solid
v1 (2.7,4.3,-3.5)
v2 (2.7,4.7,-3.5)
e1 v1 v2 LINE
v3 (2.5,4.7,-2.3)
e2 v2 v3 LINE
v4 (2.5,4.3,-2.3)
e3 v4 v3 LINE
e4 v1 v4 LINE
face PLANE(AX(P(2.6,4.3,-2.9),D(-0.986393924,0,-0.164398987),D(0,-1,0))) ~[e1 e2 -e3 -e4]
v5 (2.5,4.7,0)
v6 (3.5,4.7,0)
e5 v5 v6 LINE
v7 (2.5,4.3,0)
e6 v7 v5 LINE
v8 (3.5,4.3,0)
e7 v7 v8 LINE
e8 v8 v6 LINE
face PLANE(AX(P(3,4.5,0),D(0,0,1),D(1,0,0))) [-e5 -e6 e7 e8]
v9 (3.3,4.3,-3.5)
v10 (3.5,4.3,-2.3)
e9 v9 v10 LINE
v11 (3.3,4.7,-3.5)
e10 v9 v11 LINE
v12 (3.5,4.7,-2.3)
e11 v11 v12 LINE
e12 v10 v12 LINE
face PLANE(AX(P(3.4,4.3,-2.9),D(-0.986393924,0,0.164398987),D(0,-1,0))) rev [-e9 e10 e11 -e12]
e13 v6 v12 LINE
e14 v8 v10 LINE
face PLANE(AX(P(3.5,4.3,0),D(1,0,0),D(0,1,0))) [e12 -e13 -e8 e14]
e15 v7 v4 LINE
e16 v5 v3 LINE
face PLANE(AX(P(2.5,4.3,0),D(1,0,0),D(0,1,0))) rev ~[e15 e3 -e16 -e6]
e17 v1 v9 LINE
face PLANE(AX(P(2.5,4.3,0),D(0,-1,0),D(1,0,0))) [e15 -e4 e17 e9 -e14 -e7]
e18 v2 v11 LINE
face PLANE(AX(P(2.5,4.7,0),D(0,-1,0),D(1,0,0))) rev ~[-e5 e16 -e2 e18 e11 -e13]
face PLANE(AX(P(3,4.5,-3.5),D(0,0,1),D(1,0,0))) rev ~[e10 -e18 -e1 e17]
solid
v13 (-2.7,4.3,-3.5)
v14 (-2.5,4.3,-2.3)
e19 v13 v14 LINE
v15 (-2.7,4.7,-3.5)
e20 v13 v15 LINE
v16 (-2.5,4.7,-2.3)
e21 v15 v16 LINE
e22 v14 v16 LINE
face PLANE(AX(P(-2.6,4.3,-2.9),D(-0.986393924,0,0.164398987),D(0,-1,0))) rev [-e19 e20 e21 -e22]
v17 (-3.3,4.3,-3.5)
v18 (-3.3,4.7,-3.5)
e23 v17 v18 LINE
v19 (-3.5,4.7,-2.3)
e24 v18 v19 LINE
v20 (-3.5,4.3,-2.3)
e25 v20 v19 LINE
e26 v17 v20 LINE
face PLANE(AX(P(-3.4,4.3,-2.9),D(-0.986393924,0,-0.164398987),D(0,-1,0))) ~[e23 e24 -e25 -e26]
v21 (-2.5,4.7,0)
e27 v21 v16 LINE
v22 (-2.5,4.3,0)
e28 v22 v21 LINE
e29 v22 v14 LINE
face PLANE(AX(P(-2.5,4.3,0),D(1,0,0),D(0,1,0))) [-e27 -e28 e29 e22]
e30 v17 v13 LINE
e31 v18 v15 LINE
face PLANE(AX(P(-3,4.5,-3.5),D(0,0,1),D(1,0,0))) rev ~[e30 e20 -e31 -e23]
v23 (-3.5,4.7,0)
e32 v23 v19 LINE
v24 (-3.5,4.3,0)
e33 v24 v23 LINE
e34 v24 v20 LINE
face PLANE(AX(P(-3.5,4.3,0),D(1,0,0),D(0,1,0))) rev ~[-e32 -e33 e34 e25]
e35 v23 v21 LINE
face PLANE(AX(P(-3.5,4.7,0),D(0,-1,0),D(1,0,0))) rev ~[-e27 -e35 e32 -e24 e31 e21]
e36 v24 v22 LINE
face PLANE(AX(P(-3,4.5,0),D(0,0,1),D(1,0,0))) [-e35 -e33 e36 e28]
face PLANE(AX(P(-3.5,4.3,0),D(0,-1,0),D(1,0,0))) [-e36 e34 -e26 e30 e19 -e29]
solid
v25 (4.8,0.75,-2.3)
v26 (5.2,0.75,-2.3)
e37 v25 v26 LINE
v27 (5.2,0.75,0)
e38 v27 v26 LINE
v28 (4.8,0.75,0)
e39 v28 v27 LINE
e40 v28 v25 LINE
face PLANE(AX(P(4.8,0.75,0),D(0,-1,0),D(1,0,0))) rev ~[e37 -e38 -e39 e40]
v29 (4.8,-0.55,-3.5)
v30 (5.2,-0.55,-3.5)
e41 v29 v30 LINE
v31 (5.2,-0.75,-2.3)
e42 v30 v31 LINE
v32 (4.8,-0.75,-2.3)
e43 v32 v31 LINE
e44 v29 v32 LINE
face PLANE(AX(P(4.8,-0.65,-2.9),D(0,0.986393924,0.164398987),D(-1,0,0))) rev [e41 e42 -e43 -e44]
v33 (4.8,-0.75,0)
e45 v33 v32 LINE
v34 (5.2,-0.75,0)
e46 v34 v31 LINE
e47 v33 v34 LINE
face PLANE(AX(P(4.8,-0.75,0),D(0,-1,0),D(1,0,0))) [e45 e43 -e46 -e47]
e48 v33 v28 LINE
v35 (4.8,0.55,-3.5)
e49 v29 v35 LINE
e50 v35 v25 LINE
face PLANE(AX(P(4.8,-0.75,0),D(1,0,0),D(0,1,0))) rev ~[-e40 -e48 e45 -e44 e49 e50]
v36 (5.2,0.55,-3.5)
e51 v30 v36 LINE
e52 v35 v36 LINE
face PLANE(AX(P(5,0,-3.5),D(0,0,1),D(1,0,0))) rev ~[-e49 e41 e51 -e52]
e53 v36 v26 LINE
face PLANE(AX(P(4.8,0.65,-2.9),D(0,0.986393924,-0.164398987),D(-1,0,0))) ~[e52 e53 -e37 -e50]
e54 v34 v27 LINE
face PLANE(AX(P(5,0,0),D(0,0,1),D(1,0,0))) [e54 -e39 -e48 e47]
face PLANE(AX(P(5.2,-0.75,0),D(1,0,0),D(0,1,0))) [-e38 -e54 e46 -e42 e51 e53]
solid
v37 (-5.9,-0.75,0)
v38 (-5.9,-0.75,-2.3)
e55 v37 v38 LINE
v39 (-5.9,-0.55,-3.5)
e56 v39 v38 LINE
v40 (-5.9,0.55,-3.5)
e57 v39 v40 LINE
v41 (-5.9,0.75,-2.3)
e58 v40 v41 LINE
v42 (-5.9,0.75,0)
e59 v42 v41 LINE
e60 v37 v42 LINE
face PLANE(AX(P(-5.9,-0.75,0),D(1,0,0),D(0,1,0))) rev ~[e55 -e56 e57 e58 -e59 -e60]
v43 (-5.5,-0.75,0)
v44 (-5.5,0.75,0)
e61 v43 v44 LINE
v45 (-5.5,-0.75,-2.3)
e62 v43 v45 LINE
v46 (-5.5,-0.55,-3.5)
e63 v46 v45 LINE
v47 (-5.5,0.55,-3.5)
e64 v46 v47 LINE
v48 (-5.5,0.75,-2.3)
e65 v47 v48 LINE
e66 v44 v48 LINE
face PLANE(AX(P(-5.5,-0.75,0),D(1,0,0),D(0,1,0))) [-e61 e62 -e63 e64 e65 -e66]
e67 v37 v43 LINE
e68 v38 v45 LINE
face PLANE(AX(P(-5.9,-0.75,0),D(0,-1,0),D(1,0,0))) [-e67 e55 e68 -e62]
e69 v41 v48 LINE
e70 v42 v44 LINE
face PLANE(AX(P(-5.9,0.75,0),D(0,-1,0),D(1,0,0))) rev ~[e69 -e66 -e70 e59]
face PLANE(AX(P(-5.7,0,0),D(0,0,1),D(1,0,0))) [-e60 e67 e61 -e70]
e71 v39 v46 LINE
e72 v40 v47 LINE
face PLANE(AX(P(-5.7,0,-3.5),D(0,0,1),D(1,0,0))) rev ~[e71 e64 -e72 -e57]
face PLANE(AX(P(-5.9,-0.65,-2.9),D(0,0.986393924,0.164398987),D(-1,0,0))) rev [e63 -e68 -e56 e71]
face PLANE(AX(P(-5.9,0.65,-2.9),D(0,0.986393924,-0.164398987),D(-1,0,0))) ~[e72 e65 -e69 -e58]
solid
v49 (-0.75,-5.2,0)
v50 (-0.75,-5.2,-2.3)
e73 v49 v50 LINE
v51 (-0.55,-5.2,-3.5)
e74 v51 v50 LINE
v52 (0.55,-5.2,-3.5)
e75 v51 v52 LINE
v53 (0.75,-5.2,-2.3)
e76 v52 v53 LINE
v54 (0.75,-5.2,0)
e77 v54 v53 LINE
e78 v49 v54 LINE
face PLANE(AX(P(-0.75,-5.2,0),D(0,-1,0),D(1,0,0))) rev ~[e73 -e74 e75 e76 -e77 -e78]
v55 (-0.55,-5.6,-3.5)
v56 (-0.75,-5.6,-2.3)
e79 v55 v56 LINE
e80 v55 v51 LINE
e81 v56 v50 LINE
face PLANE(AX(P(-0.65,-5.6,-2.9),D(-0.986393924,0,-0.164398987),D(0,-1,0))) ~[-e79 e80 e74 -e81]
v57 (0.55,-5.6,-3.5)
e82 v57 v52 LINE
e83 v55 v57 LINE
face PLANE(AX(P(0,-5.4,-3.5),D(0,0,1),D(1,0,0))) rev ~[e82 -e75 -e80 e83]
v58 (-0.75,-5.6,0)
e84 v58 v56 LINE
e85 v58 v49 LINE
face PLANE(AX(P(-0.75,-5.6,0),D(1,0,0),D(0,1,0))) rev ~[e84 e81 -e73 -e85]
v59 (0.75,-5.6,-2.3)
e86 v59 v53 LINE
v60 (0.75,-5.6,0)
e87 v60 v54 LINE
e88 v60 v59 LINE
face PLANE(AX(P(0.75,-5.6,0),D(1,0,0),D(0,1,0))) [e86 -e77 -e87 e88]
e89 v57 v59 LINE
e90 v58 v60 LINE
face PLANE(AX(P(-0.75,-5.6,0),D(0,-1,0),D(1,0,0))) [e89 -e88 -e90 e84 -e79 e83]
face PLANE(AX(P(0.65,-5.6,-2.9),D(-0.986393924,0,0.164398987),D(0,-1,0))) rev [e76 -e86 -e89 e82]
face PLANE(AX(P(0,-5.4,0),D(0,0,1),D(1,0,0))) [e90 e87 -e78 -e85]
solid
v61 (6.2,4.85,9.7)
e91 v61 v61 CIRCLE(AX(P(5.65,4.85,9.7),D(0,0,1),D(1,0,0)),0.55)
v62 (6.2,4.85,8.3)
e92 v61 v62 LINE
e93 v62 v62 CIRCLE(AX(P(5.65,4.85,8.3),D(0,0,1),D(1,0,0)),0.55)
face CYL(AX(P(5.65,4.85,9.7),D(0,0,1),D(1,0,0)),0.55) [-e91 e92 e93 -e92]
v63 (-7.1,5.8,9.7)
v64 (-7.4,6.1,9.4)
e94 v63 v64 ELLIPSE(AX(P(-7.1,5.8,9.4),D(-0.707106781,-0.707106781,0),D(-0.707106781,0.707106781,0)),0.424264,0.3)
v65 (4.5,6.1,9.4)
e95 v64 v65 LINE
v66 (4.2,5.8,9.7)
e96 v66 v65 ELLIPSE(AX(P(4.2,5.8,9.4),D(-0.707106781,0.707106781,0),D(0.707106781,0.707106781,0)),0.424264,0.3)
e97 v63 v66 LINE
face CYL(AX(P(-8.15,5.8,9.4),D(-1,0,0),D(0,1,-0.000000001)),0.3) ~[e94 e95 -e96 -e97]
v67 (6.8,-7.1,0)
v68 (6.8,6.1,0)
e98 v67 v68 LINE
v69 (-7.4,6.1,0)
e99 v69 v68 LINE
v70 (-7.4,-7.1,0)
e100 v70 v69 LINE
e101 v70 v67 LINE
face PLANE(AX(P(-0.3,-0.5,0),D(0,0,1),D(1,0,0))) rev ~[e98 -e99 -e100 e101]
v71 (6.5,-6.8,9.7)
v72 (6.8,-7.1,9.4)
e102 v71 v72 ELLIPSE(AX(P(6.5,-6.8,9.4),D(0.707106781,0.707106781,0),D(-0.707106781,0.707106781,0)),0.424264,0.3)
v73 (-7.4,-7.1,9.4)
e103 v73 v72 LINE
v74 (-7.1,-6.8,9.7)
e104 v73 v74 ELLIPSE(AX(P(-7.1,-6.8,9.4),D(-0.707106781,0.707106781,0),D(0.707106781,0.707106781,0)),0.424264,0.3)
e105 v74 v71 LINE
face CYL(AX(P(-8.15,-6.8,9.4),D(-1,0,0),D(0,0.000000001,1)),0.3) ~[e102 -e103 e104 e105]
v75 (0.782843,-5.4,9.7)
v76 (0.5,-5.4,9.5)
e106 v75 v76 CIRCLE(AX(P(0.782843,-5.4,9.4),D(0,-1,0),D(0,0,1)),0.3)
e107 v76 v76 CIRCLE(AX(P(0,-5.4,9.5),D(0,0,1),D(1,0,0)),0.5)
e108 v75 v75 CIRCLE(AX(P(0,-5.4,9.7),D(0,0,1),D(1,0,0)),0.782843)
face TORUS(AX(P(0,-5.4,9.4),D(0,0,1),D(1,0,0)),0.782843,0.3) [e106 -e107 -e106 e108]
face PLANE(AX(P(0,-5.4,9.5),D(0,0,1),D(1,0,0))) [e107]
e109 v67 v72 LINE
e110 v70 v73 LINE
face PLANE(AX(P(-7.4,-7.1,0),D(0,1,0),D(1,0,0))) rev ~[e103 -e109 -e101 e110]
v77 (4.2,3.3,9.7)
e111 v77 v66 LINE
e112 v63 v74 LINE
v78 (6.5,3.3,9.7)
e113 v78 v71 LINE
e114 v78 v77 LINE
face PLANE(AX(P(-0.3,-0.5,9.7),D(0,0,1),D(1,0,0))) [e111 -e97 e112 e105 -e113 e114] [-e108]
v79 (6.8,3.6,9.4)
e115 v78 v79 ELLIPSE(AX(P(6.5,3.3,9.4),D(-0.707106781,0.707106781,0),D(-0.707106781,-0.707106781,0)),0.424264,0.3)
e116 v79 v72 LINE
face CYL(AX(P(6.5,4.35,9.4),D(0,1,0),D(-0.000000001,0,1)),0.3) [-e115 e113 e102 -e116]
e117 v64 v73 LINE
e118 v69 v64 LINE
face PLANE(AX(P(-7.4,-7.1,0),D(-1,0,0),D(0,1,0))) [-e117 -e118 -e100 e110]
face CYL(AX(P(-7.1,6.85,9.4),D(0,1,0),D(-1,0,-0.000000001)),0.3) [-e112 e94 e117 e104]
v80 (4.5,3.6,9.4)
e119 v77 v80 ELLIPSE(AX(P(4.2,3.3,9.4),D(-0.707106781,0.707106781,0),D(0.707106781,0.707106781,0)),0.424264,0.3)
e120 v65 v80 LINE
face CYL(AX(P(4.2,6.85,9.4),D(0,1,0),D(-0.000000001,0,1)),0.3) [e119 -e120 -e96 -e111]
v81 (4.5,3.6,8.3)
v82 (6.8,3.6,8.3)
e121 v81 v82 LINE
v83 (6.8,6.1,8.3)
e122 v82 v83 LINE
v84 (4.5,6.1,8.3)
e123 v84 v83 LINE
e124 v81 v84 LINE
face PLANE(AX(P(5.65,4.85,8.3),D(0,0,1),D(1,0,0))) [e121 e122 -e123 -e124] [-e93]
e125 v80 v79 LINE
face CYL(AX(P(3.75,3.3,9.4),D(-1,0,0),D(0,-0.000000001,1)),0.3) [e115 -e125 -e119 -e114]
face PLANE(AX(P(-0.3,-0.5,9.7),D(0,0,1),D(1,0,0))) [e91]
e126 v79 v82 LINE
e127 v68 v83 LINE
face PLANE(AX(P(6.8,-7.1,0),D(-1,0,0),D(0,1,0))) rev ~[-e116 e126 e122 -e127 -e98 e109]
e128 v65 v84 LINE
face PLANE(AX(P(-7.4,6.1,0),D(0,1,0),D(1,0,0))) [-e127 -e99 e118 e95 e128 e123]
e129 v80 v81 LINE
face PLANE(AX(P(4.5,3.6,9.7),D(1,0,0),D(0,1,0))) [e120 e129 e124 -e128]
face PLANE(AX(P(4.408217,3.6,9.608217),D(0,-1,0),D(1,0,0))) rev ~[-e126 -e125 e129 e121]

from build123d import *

# Parameters (mm, degrees)
F1_W         = 14.2
F1_H         = 13.2
F2_DEPTH     = 9.7
F0_W         = 0.4
F0_H         = 1.5
F3_DEPTH     = 3.5
F0_W_2       = 1.5
F0_H_2       = 0.4
F0_W_3       = 1
F4_W         = 2.3
F4_H         = 2.5
F4_R         = 0.55
F5_DEPTH     = 1.4
F4_R_2       = 0.5
F6_DEPTH     = 0.2
F7_T1_DEPTH  = 3.25
F7_T3_DEPTH  = 13.4
F7_T5_DEPTH  = 3.05
F7_T7_DEPTH  = 14.7
F7_T9_DEPTH  = 12.2
F7_T11_DEPTH = 15.7
F7_T19_DEPTH = 3.25
F7_T23_DEPTH = 3.05
F8_SIZE2     = 1.2
F8_SIZE      = 0.2
F8_2_SIZE2   = 1.2
F8_2_SIZE    = 0.2
F8_3_SIZE2   = 1.2
F8_3_SIZE    = 0.2
F8_4_SIZE2   = 1.2
F8_4_SIZE    = 0.2
F8_5_SIZE2   = 1.2
F8_5_SIZE    = 0.2


# Not quite as in the source:
# - a fillet or chamfer that OpenCascade refuses, or shapes differently, is made with other operations: its cross-section is extruded or revolved along the edge and cut away or added


with BuildPart() as f2:
    # F1 (on Top) → F2 (new body)
    with BuildSketch(Plane.XY):
        with Locations((-0.3, -0.5)):
            Rectangle(F1_W, F1_H)
    extrude(amount=F2_DEPTH)

    # F4 (on face) → F5 (cut)
    with BuildSketch(Plane.XY.offset(9.7)):
        with Locations((5.65, 4.85)):
            Rectangle(F4_W, F4_H)
        with Locations((5.65, 4.85)):
            Circle(F4_R, mode=Mode.SUBTRACT)
    extrude(amount=-F5_DEPTH, mode=Mode.SUBTRACT)

    # F4 (on face) → F6 (cut)
    with BuildSketch(Plane.XY.offset(9.7)):
        with Locations((0, -5.4)):
            Circle(F4_R_2)
    extrude(amount=-F6_DEPTH, mode=Mode.SUBTRACT)

    # F7: fillet of radius 0.3 on 7 edges, made by hand

    # F7_s2 → F7_t1 (cut)
    with BuildSketch(Plane.XZ.offset(-6.85)):
        with BuildLine():
            ThreePointArc((4.2, 9.7), (4.4121320344, 9.6121320344), (4.5, 9.4))
            Line((4.5, 9.4), (4.5, 9.7))
            Line((4.5, 9.7), (4.2, 9.7))
        make_face()
    extrude(amount=F7_T1_DEPTH, mode=Mode.SUBTRACT)

    # F7_s4 → F7_t3 (cut)
    with BuildSketch(Plane.YZ.offset(-8.15)):
        with BuildLine():
            ThreePointArc((6.1, 9.4), (6.0121320344, 9.6121320344), (5.8, 9.7))
            Line((5.8, 9.7), (6.1, 9.7))
            Line((6.1, 9.7), (6.1, 9.4))
        make_face()
    extrude(amount=F7_T3_DEPTH, mode=Mode.SUBTRACT)

    # F7_s6 → F7_t5 (cut)
    with BuildSketch(Plane.YZ.offset(4.5)):
        with BuildLine():
            ThreePointArc((3.3, 9.7), (3.5121320344, 9.6121320344), (3.6, 9.4))
            Line((3.6, 9.4), (3.6, 9.7))
            Line((3.6, 9.7), (3.3, 9.7))
        make_face()
    extrude(amount=F7_T5_DEPTH, mode=Mode.SUBTRACT)

    # F7_s8 → F7_t7 (cut)
    with BuildSketch(Plane.XZ.offset(-6.85)):
        with BuildLine():
            ThreePointArc((-7.4, 9.4), (-7.3121320344, 9.6121320344), (-7.1, 9.7))
            Line((-7.1, 9.7), (-7.4, 9.7))
            Line((-7.4, 9.7), (-7.4, 9.4))
        make_face()
    extrude(amount=F7_T7_DEPTH, mode=Mode.SUBTRACT)

    # F7_s10 → F7_t9 (cut)
    with BuildSketch(Plane.XZ.offset(-4.35)):
        with BuildLine():
            ThreePointArc((6.5, 9.7), (6.7121320344, 9.6121320344), (6.8, 9.4))
            Line((6.8, 9.4), (6.8, 9.7))
            Line((6.8, 9.7), (6.5, 9.7))
        make_face()
    extrude(amount=F7_T9_DEPTH, mode=Mode.SUBTRACT)

    # F7_s12 → F7_t11 (cut)
    with BuildSketch(Plane.YZ.offset(-8.15)):
        with BuildLine():
            ThreePointArc((-6.8, 9.7), (-7.0121320344, 9.6121320344), (-7.1, 9.4))
            Line((-7.1, 9.4), (-7.1, 9.7))
            Line((-7.1, 9.7), (-6.8, 9.7))
        make_face()
    extrude(amount=F7_T11_DEPTH, mode=Mode.SUBTRACT)

    # F7_s13 → F7_t14 (revolve, cut)
    with BuildSketch(Plane.XZ.offset(5.4)):
        with BuildLine():
            ThreePointArc((0.7828427125, 9.7), (0.6096376317, 9.6449489743), (0.5, 9.5))
            Line((0.5, 9.5), (0.5, 9.7))
            Line((0.5, 9.7), (0.7828427125, 9.7))
        make_face()
    revolve(axis=Axis((0, -5.4, 9.7), (0, 0, 1)), mode=Mode.SUBTRACT)


with BuildPart() as f3:
    # F0 (on Top) → F3 (new body)
    with BuildSketch(Plane.XY):
        with Locations((-5.7, 0)):
            Rectangle(F0_W, F0_H)
    extrude(amount=-F3_DEPTH)

    # F8
    f8_edges = [f3.edges().sort_by_distance(p)[0] for p in [
        (-5.7, -0.75, -3.5),
        (-5.7, 0.75, -3.5),
    ]]
    f8_side = f3.faces().sort_by_distance((-5.7, 0, -3.5))[0]
    chamfer(f8_edges, length=F8_SIZE, length2=F8_SIZE2, reference=f8_side)


with BuildPart() as f3b:
    # F0 (on Top) → F3, piece 2 (new body)
    with BuildSketch(Plane.XY):
        with Locations((5, 0)):
            Rectangle(F0_W, F0_H)
    extrude(amount=-F3_DEPTH)

    # F8#5
    f8_5_edges = [f3b.edges().sort_by_distance(p)[0] for p in [
        (5, -0.75, -3.5),
        (5, 0.75, -3.5),
    ]]
    f8_5_side = f3b.faces().sort_by_distance((5, 0, -3.5))[0]
    chamfer(f8_5_edges, length=F8_5_SIZE, length2=F8_5_SIZE2, reference=f8_5_side)


with BuildPart() as f3c:
    # F0 (on Top) → F3, piece 3 (new body)
    with BuildSketch(Plane.XY):
        with Locations((0, -5.4)):
            Rectangle(F0_W_2, F0_H_2)
    extrude(amount=-F3_DEPTH)

    # F8#2
    f8_2_edges = [f3c.edges().sort_by_distance(p)[0] for p in [
        (0.75, -5.4, -3.5),
        (-0.75, -5.4, -3.5),
    ]]
    f8_2_side = f3c.faces().sort_by_distance((0, -5.4, -3.5))[0]
    chamfer(f8_2_edges, length=F8_2_SIZE, length2=F8_2_SIZE2, reference=f8_2_side)


with BuildPart() as f3d:
    # F0 (on Top) → F3, piece 4 (new body)
    with BuildSketch(Plane.XY):
        with Locations((-3, 4.5)):
            Rectangle(F0_W_3, F0_H_2)
    extrude(amount=-F3_DEPTH)

    # F8#3
    f8_3_edges = [f3d.edges().sort_by_distance(p)[0] for p in [
        (-2.5, 4.5, -3.5),
        (-3.5, 4.5, -3.5),
    ]]
    f8_3_side = f3d.faces().sort_by_distance((-3, 4.5, -3.5))[0]
    chamfer(f8_3_edges, length=F8_3_SIZE, length2=F8_3_SIZE2, reference=f8_3_side)


with BuildPart() as f3e:
    # F0 (on Top) → F3, piece 5 (new body)
    with BuildSketch(Plane.XY):
        with Locations((3, 4.5)):
            Rectangle(F0_W_3, F0_H_2)
    extrude(amount=-F3_DEPTH)

    # F8#4
    f8_4_edges = [f3e.edges().sort_by_distance(p)[0] for p in [
        (2.5, 4.5, -3.5),
        (3.5, 4.5, -3.5),
    ]]
    f8_4_side = f3e.faces().sort_by_distance((3, 4.5, -3.5))[0]
    chamfer(f8_4_edges, length=F8_4_SIZE, length2=F8_4_SIZE2, reference=f8_4_side)


with BuildPart() as f7_tool17:
    # F7_s18 → F7_t19 (new body)
    with BuildSketch(Plane.XZ.offset(-6.1)):
        with BuildLine():
            ThreePointArc((4.2, 9.7), (4.4121320344, 9.6121320344), (4.5, 9.4))
            Line((4.5, 9.4), (4.5, 9.7))
            Line((4.5, 9.7), (4.2, 9.7))
        make_face()
    extrude(amount=F7_T19_DEPTH)

    split(bisect_by=Plane.XZ.offset(-3.6), keep=Keep.TOP)


with BuildPart() as f7_tool21:
    # F7_s22 → F7_t23 (new body)
    with BuildSketch(Plane.YZ.offset(3.75)):
        with BuildLine():
            ThreePointArc((3.3, 9.7), (3.5121320344, 9.6121320344), (3.6, 9.4))
            Line((3.6, 9.4), (3.6, 9.7))
            Line((3.6, 9.7), (3.3, 9.7))
        make_face()
    extrude(amount=F7_T23_DEPTH)

    split(bisect_by=Plane.YZ.offset(4.5), keep=Keep.BOTTOM)


with BuildPart() as f7_tool17_1:
    add(f7_tool17.part)

    # F7_t25: intersect F7_tool21
    add(f7_tool21.part, mode=Mode.INTERSECT)


with BuildPart() as f2_1:
    add(f2.part)

    # F7_t15: cut F7_tool17
    add(f7_tool17_1.part, mode=Mode.SUBTRACT)


solid = Compound([f3.part, f3b.part, f3c.part, f3d.part, f3e.part, f2_1.part])
